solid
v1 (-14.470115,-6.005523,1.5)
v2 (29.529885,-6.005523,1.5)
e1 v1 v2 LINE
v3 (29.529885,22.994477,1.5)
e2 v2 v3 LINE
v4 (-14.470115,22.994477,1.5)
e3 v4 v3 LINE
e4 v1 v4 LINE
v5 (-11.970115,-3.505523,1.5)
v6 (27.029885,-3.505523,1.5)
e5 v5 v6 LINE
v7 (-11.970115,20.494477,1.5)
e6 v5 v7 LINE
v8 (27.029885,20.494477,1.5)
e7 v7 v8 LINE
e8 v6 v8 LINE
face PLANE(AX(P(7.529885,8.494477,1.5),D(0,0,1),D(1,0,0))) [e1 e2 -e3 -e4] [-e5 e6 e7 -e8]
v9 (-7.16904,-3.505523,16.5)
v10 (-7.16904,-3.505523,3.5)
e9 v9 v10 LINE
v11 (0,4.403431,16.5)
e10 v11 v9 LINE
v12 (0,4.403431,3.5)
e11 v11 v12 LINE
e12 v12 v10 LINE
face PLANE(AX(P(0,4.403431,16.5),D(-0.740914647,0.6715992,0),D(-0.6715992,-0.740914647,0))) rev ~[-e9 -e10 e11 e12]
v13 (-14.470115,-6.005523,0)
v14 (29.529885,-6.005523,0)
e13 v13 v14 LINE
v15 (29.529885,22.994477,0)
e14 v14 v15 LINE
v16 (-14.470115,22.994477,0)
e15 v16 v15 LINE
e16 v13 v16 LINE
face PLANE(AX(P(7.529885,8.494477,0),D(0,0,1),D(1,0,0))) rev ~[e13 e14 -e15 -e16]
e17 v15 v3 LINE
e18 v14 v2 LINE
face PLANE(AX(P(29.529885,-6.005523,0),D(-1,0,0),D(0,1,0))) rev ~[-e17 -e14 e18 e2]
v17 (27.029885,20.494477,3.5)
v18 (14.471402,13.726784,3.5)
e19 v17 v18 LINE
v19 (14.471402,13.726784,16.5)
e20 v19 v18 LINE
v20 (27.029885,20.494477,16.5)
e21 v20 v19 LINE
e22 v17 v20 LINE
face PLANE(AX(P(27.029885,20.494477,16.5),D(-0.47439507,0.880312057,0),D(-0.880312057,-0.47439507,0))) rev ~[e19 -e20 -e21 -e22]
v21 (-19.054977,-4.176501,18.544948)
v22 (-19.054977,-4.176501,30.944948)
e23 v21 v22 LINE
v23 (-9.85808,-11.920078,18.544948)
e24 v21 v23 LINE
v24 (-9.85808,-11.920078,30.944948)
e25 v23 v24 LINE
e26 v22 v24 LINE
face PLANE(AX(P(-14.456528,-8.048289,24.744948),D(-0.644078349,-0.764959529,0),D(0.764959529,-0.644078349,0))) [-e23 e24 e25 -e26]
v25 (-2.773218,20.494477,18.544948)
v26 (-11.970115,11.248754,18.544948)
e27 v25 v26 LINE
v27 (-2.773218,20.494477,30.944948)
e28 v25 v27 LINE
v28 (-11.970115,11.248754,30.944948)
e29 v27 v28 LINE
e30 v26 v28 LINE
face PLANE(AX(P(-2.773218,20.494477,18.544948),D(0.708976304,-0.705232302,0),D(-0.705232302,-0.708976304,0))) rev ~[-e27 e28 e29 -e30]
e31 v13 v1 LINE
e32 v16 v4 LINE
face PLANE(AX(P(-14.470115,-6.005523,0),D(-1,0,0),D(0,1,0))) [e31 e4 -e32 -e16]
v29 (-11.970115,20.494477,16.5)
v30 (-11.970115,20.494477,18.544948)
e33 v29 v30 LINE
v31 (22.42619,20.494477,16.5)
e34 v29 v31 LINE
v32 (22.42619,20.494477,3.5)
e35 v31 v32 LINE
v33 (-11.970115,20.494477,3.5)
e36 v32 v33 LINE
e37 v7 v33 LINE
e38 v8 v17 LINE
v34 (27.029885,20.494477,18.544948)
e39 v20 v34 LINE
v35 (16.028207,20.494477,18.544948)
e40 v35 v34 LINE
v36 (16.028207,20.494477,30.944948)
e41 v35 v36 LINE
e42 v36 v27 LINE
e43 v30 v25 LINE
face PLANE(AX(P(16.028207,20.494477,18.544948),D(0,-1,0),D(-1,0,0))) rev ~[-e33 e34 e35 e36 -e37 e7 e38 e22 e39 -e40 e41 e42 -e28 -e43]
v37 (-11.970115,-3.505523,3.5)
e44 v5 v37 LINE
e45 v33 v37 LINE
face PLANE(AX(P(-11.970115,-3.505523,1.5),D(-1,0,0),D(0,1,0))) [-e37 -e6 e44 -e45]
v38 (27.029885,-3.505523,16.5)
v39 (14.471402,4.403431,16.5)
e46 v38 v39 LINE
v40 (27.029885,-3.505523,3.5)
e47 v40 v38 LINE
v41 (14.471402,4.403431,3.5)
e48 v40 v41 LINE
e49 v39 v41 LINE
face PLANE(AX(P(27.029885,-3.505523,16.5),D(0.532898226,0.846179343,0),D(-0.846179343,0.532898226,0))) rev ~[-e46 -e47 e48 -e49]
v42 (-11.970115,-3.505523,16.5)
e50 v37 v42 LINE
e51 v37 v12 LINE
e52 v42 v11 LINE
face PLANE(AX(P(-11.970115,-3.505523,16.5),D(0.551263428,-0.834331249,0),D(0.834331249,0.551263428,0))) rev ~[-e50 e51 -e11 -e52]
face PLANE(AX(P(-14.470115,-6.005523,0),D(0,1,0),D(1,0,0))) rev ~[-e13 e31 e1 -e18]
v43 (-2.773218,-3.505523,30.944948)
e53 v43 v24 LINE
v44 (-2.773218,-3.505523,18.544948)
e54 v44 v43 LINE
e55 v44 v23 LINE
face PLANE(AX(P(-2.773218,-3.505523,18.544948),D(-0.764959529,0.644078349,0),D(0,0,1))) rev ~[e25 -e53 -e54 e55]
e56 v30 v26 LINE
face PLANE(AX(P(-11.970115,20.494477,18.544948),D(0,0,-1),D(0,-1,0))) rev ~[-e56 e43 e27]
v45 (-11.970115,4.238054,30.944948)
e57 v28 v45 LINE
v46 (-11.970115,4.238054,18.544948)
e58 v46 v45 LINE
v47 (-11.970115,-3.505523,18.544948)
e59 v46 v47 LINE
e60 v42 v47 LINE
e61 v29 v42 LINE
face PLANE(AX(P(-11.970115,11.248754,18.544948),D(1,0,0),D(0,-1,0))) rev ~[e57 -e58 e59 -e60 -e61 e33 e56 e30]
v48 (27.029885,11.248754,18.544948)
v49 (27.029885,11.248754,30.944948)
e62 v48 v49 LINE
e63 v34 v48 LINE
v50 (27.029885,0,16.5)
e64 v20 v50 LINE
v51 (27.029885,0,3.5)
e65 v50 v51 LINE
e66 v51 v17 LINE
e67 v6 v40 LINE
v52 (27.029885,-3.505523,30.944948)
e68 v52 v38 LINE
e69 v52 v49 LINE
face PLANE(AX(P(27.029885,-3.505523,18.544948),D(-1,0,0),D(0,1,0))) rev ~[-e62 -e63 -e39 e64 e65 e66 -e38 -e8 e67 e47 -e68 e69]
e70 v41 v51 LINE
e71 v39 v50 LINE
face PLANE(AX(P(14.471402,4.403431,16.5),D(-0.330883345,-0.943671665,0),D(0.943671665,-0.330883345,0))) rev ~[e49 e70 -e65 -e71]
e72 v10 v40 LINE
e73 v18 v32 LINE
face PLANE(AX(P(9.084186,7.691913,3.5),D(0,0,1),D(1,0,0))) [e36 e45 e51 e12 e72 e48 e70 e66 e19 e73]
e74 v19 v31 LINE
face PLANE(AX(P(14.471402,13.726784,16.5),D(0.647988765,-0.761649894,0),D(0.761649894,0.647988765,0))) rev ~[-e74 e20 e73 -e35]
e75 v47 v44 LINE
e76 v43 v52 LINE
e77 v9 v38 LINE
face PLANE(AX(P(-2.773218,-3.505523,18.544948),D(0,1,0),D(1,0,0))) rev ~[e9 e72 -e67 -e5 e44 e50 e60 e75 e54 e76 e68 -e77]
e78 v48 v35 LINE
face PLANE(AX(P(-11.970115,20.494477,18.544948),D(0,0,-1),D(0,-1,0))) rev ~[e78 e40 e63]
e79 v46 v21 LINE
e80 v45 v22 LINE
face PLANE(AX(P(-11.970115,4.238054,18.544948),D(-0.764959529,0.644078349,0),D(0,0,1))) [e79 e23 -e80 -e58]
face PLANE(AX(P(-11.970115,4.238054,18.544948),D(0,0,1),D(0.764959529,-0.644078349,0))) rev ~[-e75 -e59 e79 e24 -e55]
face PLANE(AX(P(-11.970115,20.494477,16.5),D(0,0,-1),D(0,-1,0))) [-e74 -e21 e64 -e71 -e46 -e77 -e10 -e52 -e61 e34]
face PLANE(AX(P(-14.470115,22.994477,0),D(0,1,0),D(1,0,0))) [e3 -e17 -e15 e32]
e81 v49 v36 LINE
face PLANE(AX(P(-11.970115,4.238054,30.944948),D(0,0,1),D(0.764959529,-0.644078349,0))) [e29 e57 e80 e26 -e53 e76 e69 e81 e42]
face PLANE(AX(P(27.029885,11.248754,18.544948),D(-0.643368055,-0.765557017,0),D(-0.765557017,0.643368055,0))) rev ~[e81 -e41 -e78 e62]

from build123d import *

# Parameters (mm, degrees)
F0_W      = 44
F0_H      = 29
F1_DEPTH  = 1.5
F2_W      = 39
F2_H      = 24
F3_DEPTH  = 15
F5_DEPTH  = 13
F8_W      = 24
F8_H      = 2.0449477285
F9_DEPTH  = 39
F11_DEPTH = 12.4
F12_W     = 12.0227243644
F12_H     = 12.4
F13_DEPTH = 11


# Not quite as in the source:
# - a feature names something its author has since deleted; it is built from what else it names


with BuildPart() as f1:
    # F0 (on Top) → F1 (new body)
    with BuildSketch(Plane.XY):
        with Locations((7.5298845768, 8.4944772368)):
            Rectangle(F0_W, F0_H)
    extrude(amount=F1_DEPTH)

    # F2 (on face) → F3 (join)
    with BuildSketch(Plane.XY.offset(1.5)):
        with Locations((7.5298845768, 8.4944772368)):
            Rectangle(F2_W, F2_H)
    extrude(amount=F3_DEPTH)

    # F4 (on face) → F5 (cut)
    with BuildSketch(Plane.XY.offset(16.5)):
        Polygon((22.4261898547, 20.4944772368), (-11.9701154232, 20.4944772368), (-11.9701154232, -3.5055227632), (0, 4.4034305029), (-7.16903992, -3.5055227632), (27.0298845768, -3.5055227632), (14.4714023918, 4.4034305029), (27.0298845768, 0), (27.0298845768, 20.4944772368), (14.4714023918, 13.7267839164), align=None)
    extrude(amount=-F5_DEPTH, mode=Mode.SUBTRACT)

    # F8 (on face) → F9 (join)
    with BuildSketch(Plane(origin=(-11.9701154232, 0, 0), x_dir=(0, -1, 0), z_dir=(-1, 0, 0))):
        with Locations((-8.4944772368, 17.5224738643)):
            Rectangle(F8_W, F8_H)
    extrude(amount=-F9_DEPTH)

    # F10 (on face) → F11 (join)
    with BuildSketch(Plane.XY.offset(18.5449477285)):
        Polygon((16.0282067955, 20.4944772368), (-2.7732178569, 20.4944772368), (-11.9701154232, 11.2487543374), (-11.9701154232, 4.2380536906), (-2.7732178569, -3.5055227632), (27.0298845768, -3.5055227632), (27.0298845768, 11.2487543374), align=None)
    extrude(amount=F11_DEPTH)

    # F12 (on face) → F13 (join)
    with BuildSketch(Plane(origin=(-2.8775827287, -3.4176499389, 0), x_dir=(0.7649595289, -0.6440783486, 0), z_dir=(-0.6440783486, -0.7649595289, 0))):
        with Locations((-5.8749302955, 24.7449477285)):
            Rectangle(F12_W, F12_H)
    extrude(amount=F13_DEPTH)


solid = f1.part
